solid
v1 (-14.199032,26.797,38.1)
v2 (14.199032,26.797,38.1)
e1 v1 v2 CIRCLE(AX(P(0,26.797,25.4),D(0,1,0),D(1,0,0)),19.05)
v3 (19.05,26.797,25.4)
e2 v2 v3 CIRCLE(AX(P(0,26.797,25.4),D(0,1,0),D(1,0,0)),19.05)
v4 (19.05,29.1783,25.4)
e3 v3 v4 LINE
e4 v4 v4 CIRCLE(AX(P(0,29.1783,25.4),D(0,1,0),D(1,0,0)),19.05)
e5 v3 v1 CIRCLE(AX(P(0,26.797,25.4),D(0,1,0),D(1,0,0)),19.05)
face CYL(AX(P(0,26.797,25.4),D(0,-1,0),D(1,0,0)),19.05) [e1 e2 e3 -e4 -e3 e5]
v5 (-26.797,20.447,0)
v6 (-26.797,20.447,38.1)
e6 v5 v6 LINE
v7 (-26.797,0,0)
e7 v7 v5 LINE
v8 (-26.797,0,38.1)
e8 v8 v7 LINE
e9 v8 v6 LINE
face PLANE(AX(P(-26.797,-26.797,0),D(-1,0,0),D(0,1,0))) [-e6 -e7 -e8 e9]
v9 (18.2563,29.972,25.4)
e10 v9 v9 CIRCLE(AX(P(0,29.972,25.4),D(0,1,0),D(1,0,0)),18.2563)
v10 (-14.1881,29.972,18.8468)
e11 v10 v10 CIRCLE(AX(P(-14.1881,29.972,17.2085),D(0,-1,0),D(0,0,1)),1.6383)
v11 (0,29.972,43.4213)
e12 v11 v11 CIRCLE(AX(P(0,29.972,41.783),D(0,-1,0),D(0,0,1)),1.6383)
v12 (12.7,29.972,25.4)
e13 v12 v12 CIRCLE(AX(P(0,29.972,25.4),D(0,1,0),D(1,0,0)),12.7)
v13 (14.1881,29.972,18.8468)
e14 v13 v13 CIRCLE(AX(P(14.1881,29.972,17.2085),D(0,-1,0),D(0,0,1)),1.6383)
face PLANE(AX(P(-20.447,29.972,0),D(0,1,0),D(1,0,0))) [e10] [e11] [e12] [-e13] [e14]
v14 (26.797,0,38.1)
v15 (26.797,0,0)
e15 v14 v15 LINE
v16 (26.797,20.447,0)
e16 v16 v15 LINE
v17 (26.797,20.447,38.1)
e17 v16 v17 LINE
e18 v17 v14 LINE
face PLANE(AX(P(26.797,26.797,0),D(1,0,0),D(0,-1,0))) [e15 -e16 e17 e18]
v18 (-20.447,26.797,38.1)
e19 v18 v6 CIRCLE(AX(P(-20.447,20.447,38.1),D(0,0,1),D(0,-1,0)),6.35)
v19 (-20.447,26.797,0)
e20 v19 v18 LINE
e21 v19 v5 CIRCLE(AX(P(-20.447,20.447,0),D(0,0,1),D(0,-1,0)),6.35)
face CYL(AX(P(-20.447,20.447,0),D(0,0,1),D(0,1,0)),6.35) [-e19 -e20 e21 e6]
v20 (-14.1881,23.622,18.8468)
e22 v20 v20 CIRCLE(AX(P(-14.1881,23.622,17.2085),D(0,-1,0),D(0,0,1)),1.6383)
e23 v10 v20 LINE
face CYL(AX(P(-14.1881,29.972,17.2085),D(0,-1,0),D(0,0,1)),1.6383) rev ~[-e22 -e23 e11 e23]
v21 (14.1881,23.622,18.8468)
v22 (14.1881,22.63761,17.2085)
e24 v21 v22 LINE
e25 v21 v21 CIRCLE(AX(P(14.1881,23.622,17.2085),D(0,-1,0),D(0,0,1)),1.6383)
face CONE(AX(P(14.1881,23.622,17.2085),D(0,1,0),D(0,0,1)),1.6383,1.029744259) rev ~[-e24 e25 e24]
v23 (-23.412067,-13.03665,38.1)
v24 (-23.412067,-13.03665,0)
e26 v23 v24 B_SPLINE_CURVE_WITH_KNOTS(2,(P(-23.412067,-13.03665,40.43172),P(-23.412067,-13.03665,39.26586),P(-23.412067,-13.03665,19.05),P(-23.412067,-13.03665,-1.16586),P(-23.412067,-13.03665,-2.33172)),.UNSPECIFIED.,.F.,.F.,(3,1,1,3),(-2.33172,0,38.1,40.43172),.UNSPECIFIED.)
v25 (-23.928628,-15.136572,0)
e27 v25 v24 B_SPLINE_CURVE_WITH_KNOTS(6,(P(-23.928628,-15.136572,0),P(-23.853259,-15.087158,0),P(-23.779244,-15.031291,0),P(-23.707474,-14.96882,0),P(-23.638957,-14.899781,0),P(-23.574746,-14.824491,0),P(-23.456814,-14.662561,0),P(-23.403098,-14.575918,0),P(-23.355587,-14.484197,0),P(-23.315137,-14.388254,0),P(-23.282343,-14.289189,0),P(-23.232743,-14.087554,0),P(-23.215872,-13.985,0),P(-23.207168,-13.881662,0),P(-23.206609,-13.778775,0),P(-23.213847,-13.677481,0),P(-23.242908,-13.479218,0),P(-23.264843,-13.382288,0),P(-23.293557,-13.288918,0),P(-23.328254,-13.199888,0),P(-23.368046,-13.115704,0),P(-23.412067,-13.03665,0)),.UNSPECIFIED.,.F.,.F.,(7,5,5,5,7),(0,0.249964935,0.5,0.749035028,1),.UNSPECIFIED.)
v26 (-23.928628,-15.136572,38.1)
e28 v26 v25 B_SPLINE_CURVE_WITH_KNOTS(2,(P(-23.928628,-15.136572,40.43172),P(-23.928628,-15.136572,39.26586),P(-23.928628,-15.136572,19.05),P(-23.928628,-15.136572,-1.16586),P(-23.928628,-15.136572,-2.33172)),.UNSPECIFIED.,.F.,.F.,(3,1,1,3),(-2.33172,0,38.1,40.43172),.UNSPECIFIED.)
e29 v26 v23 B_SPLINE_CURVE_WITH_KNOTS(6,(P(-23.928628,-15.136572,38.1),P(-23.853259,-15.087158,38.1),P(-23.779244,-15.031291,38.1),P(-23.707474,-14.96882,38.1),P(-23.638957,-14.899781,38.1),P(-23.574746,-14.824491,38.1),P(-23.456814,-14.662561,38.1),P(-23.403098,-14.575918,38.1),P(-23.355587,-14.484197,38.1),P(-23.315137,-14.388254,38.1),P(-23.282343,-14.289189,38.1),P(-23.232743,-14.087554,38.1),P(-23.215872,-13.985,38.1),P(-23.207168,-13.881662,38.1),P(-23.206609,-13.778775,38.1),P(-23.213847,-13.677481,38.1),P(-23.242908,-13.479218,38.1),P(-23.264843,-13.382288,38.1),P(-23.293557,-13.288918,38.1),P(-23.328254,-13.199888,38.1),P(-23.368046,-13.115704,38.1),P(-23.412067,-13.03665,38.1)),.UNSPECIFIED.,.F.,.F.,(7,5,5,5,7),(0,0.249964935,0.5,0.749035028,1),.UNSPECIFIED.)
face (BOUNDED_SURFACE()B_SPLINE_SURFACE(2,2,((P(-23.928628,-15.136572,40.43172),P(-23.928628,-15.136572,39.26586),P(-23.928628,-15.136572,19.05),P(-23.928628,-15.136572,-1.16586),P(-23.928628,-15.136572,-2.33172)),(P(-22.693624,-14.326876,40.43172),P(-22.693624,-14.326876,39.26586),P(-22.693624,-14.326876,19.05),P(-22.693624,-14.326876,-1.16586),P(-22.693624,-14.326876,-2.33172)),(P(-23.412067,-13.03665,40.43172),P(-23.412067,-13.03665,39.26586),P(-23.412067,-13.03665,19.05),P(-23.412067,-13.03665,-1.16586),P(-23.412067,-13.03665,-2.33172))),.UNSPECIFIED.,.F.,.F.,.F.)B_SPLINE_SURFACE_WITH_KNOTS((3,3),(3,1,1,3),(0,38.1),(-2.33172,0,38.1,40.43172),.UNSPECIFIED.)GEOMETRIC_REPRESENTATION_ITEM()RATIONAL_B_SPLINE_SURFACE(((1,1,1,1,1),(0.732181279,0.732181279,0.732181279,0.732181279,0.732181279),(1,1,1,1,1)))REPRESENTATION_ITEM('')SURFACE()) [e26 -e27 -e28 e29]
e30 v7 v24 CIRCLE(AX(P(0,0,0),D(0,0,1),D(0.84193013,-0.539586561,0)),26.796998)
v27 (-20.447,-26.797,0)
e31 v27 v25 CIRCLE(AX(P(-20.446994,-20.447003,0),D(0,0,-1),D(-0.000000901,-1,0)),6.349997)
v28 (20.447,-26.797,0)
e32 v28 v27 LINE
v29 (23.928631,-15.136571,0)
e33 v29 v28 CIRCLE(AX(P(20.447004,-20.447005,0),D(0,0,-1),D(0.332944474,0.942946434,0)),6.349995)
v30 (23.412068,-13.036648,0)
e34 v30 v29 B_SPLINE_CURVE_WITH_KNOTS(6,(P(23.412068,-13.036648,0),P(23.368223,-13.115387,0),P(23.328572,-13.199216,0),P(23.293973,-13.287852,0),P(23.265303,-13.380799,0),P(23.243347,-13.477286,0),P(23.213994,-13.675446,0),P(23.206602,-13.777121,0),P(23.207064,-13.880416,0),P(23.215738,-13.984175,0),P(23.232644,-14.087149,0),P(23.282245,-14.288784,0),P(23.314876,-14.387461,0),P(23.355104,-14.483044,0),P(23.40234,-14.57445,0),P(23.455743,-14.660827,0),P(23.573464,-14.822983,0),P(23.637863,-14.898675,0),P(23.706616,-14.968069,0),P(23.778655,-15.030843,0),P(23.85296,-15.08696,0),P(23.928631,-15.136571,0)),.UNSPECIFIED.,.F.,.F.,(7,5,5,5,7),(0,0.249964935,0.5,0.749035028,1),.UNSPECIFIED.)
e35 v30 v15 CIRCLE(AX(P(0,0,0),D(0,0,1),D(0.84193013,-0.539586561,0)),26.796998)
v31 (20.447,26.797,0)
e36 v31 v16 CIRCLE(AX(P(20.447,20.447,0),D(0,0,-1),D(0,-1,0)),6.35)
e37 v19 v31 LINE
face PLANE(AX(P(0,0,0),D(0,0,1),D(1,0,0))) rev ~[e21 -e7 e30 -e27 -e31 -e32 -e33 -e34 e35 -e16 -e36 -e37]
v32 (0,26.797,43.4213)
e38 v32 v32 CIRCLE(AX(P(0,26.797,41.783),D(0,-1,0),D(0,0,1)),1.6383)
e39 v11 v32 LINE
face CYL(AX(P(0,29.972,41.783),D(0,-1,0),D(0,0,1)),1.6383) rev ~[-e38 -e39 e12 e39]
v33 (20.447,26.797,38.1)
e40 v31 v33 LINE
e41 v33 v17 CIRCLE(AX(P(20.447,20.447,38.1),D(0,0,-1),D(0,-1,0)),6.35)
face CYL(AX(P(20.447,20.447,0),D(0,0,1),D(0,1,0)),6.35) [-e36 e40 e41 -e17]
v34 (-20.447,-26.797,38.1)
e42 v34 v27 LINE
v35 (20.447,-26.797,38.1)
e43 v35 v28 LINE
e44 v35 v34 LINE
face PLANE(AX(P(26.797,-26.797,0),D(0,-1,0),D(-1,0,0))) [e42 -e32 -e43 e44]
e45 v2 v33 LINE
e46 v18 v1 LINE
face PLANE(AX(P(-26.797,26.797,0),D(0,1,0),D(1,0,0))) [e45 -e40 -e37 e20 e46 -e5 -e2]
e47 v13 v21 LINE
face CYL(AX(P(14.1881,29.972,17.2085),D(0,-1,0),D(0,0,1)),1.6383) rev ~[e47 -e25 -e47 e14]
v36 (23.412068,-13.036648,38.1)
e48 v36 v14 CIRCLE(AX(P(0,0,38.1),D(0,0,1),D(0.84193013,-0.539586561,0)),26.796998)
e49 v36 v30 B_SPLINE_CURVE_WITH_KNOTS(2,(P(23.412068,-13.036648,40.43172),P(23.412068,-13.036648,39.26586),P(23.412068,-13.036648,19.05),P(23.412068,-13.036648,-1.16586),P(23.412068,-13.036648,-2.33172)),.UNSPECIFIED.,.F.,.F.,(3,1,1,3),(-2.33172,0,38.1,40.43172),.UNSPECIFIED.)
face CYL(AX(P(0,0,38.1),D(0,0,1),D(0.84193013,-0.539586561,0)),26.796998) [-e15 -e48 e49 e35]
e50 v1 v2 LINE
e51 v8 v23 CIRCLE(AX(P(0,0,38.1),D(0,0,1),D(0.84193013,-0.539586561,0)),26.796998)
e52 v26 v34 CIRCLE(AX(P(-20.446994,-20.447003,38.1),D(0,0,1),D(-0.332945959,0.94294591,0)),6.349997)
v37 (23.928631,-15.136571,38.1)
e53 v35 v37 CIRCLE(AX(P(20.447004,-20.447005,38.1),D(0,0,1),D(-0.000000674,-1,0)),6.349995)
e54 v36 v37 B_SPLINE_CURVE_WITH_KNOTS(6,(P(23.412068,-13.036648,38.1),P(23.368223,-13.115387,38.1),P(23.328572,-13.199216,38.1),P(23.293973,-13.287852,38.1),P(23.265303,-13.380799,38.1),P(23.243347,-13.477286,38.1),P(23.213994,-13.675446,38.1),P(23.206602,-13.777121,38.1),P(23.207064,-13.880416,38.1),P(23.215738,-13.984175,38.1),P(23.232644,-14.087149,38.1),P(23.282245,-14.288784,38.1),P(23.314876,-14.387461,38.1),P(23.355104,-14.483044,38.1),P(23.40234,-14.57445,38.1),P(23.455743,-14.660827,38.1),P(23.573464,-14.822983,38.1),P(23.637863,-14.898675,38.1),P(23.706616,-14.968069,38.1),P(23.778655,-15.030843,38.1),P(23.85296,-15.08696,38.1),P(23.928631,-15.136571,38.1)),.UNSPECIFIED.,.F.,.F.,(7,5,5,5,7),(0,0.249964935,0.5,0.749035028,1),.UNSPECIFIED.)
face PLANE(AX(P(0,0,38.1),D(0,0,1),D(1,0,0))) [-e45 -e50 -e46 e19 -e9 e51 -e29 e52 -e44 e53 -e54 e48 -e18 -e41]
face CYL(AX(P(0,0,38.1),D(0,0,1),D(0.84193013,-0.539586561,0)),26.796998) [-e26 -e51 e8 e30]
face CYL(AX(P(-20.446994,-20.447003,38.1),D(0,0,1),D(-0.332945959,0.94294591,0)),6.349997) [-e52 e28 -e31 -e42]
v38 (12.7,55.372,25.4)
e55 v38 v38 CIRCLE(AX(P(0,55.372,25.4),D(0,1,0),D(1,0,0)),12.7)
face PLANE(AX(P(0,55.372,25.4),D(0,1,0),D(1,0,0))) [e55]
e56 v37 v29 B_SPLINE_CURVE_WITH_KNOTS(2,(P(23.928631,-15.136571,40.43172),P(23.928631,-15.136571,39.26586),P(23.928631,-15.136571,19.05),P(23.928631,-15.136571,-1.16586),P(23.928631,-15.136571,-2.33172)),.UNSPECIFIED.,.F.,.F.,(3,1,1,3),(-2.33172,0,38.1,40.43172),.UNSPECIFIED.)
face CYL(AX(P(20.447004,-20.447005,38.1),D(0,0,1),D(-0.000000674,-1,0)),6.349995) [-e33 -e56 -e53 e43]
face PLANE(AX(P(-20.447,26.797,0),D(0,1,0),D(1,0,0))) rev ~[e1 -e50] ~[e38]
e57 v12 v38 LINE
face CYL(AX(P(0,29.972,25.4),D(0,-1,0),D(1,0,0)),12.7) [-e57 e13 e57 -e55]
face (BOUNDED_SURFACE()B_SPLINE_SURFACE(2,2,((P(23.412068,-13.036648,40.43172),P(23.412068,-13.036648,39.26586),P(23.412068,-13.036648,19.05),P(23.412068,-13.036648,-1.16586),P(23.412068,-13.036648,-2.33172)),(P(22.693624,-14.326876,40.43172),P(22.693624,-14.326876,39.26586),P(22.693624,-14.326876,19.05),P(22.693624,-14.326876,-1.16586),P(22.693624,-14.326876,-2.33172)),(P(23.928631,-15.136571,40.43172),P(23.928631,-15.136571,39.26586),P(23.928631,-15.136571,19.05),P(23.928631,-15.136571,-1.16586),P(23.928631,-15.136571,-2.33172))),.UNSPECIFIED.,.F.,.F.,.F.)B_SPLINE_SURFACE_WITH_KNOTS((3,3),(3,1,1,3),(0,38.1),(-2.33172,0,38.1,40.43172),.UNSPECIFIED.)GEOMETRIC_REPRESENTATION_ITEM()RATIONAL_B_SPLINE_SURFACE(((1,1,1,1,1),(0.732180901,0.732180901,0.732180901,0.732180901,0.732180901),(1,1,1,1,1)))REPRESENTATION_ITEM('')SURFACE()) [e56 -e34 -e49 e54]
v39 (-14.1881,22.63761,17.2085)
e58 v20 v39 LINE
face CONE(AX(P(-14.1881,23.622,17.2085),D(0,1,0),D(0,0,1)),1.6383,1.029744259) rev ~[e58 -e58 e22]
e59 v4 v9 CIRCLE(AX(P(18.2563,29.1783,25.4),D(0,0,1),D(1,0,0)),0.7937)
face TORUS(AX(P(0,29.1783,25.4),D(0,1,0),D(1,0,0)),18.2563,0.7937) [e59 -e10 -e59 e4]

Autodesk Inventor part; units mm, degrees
ref_plane "YZ Plane" through (0, 0, 0) normal (1, 0, 0) x (0, 1, 0)
ref_plane "XZ Plane" through (0, 0, 0) normal (0, 1, 0) x (-1, 0, 0)
ref_plane "XY Plane" through (0, 0, 0) normal (0, 0, 1) x (1, 0, 0)
sketch "Sketch1" plane through (0, 0, 0) normal (0, 0, 1) x (1, 0, 0)
  line L0 (-26.797, 26.797) -> (26.797, 26.797)
  line L1 (26.797, 26.797) -> (26.797, -26.797)
  line L2 (26.797, -26.797) -> (-26.797, -26.797)
  line L3 (-26.797, -26.797) -> (-26.797, 26.797)
  point P0 (0, 0)
  point P1 (-26.797, 0)
  point P2 (0, 26.797)
  dimension "d0" = 53.594
  dimension "d1" = 53.594
extrude "Extrusion1" add sketch "Sketch1" along normal blind 38.1
fillet "Fillet1" radius 6.35 2 edges at (-26.797, 26.797, 19.05) (26.797, 26.797, 19.05)
sketch "Sketch3" plane through (0, 0, 38.1) normal (0, 0, 1) x (1, 0, 0)
  arc A0 (26.797, 20.447) -> (20.447, 26.797) centre (20.447, 20.447) ccw projected
  line L0 (-20.447, 26.797) -> (20.447, 26.797) projected
  arc A1 (-20.447, 26.797) -> (-26.797, 20.447) centre (-20.447, 20.447) ccw projected
  line L1 (-26.797, -26.797) -> (-26.797, 20.447) projected
  line L2 (26.797, -26.797) -> (-26.797, -26.797) projected
  line L3 (26.797, 20.447) -> (26.797, -26.797) projected
  arc A2 (-22.5612, -14.4593) -> (-20.447, -26.797) centre (-20.447, -20.447) ccw
  arc A3 (20.447, -26.797) -> (22.5612, -14.4593) centre (20.447, -20.447) ccw
  line L4 (-26.797, -26.797) -> (26.797, -26.797)
  line L5 (-26.797, 0) -> (-26.797, -26.797)
  line L6 (26.797, 0) -> (26.797, -26.797)
  arc A4 (22.5612, -14.4593) -> (-22.5612, -14.4593) centre (0, 0) ccw
  line L7 (-26.797, 0) -> (-26.797, 20.447)
  line L8 (-20.447, 26.797) -> (20.447, 26.797)
  line L9 (26.797, 20.447) -> (26.797, 0)
  arc A5 (-20.447, 26.797) -> (-26.797, 20.447) centre (-20.447, 20.447) ccw
  arc A6 (26.797, 20.447) -> (20.447, 26.797) centre (20.447, 20.447) ccw
  dimension "d9" = 12.7
  dimension "d10" = 12.7
  dimension "d12" = 26.797
extrude "Extrusion2" cut sketch "Sketch3" against normal through all contours L3 A3 A4 | L3 L2 A3 | A4 A2 L1 | A2 L2 L1
fillet "Fillet2" radius 1.5875 2 edges at (22.5612, -14.4593, 19.05) (-22.5612, -14.4593, 19.05)
sketch "Sketch4" plane through (-20.447, 26.797, 0) normal (0, 1, 0) x (1, 0, 0)
  line L0 (0, 0) -> (40.894, 0) projected
  line L1 (-6.35, -38.1) -> (0, -38.1) projected
  line L2 (0, -38.1) -> (0, 0) projected
  line L3 (0, 0) -> (-6.35, 0) projected
  line L4 (-6.35, 0) -> (-6.35, -38.1) projected
  line L5 (43.8591, 0) -> (43.8591, -38.1) projected
  line L6 (40.894, -38.1) -> (47.244, -38.1) projected
  line L7 (47.244, -38.1) -> (47.244, 0) projected
  line L8 (47.244, 0) -> (40.894, 0) projected
  line L9 (40.894, 0) -> (40.894, -38.1) projected
  line L10 (-2.9651, -38.1) -> (-2.9651, 0) projected
  circle A0 centre (20.447, -25.4) radius 19.05
  point P0 (20.447, 0)
  point P1 (20.447, -6.35)
  point P2 (20.447, 0)
  dimension "d16" = 38.1
  dimension "d17" = 6.35
extrude "Extrusion3" add sketch "Sketch4" along normal blind 3.175 contours A0
fillet "Fillet3" radius 0.7937 1 edges at (-19.05, 29.972, 25.4)
sketch "Sketch5" plane through (0, 29.972, 25.4) normal (0, 1, 0) x (1, 0, 0)
  circle A0 centre (0, 0) radius 18.2562 projected
  circle A1 centre (0, 0) radius 12.7
  circle A2 centre (0, 0) radius 19.05 projected
  point P0 (0, 25.4)
  dimension "d24" = 6.35
extrude "Extrusion4" add sketch "Sketch5" along normal blind 25.4 contours A1
sketch "Sketch6" plane through (0, 29.972, 25.4) normal (0, 1, 0) x (1, 0, 0)
  circle A0 centre (-14.1881, 8.1915) radius 1.6383 projected
  circle A1 centre (0, -16.383) radius 1.6383 projected
  circle A2 centre (14.1881, 8.1915) radius 1.6383 projected
  point P0 (0, 25.4)
hole "Hole1" at (0, 29.972, 41.783) at (14.1881, 29.972, 17.2085) at (-14.1881, 29.972, 17.2085) direction (0, -1, 0) diameter 3.2766 depth 6.35 tip angle 118 clearance for "Flat Head Machine Screw (82)" size "#4" standard "Ansi Unified Screw Threads"
properties part number "Pneumatics_VIAIR_0090_02"
